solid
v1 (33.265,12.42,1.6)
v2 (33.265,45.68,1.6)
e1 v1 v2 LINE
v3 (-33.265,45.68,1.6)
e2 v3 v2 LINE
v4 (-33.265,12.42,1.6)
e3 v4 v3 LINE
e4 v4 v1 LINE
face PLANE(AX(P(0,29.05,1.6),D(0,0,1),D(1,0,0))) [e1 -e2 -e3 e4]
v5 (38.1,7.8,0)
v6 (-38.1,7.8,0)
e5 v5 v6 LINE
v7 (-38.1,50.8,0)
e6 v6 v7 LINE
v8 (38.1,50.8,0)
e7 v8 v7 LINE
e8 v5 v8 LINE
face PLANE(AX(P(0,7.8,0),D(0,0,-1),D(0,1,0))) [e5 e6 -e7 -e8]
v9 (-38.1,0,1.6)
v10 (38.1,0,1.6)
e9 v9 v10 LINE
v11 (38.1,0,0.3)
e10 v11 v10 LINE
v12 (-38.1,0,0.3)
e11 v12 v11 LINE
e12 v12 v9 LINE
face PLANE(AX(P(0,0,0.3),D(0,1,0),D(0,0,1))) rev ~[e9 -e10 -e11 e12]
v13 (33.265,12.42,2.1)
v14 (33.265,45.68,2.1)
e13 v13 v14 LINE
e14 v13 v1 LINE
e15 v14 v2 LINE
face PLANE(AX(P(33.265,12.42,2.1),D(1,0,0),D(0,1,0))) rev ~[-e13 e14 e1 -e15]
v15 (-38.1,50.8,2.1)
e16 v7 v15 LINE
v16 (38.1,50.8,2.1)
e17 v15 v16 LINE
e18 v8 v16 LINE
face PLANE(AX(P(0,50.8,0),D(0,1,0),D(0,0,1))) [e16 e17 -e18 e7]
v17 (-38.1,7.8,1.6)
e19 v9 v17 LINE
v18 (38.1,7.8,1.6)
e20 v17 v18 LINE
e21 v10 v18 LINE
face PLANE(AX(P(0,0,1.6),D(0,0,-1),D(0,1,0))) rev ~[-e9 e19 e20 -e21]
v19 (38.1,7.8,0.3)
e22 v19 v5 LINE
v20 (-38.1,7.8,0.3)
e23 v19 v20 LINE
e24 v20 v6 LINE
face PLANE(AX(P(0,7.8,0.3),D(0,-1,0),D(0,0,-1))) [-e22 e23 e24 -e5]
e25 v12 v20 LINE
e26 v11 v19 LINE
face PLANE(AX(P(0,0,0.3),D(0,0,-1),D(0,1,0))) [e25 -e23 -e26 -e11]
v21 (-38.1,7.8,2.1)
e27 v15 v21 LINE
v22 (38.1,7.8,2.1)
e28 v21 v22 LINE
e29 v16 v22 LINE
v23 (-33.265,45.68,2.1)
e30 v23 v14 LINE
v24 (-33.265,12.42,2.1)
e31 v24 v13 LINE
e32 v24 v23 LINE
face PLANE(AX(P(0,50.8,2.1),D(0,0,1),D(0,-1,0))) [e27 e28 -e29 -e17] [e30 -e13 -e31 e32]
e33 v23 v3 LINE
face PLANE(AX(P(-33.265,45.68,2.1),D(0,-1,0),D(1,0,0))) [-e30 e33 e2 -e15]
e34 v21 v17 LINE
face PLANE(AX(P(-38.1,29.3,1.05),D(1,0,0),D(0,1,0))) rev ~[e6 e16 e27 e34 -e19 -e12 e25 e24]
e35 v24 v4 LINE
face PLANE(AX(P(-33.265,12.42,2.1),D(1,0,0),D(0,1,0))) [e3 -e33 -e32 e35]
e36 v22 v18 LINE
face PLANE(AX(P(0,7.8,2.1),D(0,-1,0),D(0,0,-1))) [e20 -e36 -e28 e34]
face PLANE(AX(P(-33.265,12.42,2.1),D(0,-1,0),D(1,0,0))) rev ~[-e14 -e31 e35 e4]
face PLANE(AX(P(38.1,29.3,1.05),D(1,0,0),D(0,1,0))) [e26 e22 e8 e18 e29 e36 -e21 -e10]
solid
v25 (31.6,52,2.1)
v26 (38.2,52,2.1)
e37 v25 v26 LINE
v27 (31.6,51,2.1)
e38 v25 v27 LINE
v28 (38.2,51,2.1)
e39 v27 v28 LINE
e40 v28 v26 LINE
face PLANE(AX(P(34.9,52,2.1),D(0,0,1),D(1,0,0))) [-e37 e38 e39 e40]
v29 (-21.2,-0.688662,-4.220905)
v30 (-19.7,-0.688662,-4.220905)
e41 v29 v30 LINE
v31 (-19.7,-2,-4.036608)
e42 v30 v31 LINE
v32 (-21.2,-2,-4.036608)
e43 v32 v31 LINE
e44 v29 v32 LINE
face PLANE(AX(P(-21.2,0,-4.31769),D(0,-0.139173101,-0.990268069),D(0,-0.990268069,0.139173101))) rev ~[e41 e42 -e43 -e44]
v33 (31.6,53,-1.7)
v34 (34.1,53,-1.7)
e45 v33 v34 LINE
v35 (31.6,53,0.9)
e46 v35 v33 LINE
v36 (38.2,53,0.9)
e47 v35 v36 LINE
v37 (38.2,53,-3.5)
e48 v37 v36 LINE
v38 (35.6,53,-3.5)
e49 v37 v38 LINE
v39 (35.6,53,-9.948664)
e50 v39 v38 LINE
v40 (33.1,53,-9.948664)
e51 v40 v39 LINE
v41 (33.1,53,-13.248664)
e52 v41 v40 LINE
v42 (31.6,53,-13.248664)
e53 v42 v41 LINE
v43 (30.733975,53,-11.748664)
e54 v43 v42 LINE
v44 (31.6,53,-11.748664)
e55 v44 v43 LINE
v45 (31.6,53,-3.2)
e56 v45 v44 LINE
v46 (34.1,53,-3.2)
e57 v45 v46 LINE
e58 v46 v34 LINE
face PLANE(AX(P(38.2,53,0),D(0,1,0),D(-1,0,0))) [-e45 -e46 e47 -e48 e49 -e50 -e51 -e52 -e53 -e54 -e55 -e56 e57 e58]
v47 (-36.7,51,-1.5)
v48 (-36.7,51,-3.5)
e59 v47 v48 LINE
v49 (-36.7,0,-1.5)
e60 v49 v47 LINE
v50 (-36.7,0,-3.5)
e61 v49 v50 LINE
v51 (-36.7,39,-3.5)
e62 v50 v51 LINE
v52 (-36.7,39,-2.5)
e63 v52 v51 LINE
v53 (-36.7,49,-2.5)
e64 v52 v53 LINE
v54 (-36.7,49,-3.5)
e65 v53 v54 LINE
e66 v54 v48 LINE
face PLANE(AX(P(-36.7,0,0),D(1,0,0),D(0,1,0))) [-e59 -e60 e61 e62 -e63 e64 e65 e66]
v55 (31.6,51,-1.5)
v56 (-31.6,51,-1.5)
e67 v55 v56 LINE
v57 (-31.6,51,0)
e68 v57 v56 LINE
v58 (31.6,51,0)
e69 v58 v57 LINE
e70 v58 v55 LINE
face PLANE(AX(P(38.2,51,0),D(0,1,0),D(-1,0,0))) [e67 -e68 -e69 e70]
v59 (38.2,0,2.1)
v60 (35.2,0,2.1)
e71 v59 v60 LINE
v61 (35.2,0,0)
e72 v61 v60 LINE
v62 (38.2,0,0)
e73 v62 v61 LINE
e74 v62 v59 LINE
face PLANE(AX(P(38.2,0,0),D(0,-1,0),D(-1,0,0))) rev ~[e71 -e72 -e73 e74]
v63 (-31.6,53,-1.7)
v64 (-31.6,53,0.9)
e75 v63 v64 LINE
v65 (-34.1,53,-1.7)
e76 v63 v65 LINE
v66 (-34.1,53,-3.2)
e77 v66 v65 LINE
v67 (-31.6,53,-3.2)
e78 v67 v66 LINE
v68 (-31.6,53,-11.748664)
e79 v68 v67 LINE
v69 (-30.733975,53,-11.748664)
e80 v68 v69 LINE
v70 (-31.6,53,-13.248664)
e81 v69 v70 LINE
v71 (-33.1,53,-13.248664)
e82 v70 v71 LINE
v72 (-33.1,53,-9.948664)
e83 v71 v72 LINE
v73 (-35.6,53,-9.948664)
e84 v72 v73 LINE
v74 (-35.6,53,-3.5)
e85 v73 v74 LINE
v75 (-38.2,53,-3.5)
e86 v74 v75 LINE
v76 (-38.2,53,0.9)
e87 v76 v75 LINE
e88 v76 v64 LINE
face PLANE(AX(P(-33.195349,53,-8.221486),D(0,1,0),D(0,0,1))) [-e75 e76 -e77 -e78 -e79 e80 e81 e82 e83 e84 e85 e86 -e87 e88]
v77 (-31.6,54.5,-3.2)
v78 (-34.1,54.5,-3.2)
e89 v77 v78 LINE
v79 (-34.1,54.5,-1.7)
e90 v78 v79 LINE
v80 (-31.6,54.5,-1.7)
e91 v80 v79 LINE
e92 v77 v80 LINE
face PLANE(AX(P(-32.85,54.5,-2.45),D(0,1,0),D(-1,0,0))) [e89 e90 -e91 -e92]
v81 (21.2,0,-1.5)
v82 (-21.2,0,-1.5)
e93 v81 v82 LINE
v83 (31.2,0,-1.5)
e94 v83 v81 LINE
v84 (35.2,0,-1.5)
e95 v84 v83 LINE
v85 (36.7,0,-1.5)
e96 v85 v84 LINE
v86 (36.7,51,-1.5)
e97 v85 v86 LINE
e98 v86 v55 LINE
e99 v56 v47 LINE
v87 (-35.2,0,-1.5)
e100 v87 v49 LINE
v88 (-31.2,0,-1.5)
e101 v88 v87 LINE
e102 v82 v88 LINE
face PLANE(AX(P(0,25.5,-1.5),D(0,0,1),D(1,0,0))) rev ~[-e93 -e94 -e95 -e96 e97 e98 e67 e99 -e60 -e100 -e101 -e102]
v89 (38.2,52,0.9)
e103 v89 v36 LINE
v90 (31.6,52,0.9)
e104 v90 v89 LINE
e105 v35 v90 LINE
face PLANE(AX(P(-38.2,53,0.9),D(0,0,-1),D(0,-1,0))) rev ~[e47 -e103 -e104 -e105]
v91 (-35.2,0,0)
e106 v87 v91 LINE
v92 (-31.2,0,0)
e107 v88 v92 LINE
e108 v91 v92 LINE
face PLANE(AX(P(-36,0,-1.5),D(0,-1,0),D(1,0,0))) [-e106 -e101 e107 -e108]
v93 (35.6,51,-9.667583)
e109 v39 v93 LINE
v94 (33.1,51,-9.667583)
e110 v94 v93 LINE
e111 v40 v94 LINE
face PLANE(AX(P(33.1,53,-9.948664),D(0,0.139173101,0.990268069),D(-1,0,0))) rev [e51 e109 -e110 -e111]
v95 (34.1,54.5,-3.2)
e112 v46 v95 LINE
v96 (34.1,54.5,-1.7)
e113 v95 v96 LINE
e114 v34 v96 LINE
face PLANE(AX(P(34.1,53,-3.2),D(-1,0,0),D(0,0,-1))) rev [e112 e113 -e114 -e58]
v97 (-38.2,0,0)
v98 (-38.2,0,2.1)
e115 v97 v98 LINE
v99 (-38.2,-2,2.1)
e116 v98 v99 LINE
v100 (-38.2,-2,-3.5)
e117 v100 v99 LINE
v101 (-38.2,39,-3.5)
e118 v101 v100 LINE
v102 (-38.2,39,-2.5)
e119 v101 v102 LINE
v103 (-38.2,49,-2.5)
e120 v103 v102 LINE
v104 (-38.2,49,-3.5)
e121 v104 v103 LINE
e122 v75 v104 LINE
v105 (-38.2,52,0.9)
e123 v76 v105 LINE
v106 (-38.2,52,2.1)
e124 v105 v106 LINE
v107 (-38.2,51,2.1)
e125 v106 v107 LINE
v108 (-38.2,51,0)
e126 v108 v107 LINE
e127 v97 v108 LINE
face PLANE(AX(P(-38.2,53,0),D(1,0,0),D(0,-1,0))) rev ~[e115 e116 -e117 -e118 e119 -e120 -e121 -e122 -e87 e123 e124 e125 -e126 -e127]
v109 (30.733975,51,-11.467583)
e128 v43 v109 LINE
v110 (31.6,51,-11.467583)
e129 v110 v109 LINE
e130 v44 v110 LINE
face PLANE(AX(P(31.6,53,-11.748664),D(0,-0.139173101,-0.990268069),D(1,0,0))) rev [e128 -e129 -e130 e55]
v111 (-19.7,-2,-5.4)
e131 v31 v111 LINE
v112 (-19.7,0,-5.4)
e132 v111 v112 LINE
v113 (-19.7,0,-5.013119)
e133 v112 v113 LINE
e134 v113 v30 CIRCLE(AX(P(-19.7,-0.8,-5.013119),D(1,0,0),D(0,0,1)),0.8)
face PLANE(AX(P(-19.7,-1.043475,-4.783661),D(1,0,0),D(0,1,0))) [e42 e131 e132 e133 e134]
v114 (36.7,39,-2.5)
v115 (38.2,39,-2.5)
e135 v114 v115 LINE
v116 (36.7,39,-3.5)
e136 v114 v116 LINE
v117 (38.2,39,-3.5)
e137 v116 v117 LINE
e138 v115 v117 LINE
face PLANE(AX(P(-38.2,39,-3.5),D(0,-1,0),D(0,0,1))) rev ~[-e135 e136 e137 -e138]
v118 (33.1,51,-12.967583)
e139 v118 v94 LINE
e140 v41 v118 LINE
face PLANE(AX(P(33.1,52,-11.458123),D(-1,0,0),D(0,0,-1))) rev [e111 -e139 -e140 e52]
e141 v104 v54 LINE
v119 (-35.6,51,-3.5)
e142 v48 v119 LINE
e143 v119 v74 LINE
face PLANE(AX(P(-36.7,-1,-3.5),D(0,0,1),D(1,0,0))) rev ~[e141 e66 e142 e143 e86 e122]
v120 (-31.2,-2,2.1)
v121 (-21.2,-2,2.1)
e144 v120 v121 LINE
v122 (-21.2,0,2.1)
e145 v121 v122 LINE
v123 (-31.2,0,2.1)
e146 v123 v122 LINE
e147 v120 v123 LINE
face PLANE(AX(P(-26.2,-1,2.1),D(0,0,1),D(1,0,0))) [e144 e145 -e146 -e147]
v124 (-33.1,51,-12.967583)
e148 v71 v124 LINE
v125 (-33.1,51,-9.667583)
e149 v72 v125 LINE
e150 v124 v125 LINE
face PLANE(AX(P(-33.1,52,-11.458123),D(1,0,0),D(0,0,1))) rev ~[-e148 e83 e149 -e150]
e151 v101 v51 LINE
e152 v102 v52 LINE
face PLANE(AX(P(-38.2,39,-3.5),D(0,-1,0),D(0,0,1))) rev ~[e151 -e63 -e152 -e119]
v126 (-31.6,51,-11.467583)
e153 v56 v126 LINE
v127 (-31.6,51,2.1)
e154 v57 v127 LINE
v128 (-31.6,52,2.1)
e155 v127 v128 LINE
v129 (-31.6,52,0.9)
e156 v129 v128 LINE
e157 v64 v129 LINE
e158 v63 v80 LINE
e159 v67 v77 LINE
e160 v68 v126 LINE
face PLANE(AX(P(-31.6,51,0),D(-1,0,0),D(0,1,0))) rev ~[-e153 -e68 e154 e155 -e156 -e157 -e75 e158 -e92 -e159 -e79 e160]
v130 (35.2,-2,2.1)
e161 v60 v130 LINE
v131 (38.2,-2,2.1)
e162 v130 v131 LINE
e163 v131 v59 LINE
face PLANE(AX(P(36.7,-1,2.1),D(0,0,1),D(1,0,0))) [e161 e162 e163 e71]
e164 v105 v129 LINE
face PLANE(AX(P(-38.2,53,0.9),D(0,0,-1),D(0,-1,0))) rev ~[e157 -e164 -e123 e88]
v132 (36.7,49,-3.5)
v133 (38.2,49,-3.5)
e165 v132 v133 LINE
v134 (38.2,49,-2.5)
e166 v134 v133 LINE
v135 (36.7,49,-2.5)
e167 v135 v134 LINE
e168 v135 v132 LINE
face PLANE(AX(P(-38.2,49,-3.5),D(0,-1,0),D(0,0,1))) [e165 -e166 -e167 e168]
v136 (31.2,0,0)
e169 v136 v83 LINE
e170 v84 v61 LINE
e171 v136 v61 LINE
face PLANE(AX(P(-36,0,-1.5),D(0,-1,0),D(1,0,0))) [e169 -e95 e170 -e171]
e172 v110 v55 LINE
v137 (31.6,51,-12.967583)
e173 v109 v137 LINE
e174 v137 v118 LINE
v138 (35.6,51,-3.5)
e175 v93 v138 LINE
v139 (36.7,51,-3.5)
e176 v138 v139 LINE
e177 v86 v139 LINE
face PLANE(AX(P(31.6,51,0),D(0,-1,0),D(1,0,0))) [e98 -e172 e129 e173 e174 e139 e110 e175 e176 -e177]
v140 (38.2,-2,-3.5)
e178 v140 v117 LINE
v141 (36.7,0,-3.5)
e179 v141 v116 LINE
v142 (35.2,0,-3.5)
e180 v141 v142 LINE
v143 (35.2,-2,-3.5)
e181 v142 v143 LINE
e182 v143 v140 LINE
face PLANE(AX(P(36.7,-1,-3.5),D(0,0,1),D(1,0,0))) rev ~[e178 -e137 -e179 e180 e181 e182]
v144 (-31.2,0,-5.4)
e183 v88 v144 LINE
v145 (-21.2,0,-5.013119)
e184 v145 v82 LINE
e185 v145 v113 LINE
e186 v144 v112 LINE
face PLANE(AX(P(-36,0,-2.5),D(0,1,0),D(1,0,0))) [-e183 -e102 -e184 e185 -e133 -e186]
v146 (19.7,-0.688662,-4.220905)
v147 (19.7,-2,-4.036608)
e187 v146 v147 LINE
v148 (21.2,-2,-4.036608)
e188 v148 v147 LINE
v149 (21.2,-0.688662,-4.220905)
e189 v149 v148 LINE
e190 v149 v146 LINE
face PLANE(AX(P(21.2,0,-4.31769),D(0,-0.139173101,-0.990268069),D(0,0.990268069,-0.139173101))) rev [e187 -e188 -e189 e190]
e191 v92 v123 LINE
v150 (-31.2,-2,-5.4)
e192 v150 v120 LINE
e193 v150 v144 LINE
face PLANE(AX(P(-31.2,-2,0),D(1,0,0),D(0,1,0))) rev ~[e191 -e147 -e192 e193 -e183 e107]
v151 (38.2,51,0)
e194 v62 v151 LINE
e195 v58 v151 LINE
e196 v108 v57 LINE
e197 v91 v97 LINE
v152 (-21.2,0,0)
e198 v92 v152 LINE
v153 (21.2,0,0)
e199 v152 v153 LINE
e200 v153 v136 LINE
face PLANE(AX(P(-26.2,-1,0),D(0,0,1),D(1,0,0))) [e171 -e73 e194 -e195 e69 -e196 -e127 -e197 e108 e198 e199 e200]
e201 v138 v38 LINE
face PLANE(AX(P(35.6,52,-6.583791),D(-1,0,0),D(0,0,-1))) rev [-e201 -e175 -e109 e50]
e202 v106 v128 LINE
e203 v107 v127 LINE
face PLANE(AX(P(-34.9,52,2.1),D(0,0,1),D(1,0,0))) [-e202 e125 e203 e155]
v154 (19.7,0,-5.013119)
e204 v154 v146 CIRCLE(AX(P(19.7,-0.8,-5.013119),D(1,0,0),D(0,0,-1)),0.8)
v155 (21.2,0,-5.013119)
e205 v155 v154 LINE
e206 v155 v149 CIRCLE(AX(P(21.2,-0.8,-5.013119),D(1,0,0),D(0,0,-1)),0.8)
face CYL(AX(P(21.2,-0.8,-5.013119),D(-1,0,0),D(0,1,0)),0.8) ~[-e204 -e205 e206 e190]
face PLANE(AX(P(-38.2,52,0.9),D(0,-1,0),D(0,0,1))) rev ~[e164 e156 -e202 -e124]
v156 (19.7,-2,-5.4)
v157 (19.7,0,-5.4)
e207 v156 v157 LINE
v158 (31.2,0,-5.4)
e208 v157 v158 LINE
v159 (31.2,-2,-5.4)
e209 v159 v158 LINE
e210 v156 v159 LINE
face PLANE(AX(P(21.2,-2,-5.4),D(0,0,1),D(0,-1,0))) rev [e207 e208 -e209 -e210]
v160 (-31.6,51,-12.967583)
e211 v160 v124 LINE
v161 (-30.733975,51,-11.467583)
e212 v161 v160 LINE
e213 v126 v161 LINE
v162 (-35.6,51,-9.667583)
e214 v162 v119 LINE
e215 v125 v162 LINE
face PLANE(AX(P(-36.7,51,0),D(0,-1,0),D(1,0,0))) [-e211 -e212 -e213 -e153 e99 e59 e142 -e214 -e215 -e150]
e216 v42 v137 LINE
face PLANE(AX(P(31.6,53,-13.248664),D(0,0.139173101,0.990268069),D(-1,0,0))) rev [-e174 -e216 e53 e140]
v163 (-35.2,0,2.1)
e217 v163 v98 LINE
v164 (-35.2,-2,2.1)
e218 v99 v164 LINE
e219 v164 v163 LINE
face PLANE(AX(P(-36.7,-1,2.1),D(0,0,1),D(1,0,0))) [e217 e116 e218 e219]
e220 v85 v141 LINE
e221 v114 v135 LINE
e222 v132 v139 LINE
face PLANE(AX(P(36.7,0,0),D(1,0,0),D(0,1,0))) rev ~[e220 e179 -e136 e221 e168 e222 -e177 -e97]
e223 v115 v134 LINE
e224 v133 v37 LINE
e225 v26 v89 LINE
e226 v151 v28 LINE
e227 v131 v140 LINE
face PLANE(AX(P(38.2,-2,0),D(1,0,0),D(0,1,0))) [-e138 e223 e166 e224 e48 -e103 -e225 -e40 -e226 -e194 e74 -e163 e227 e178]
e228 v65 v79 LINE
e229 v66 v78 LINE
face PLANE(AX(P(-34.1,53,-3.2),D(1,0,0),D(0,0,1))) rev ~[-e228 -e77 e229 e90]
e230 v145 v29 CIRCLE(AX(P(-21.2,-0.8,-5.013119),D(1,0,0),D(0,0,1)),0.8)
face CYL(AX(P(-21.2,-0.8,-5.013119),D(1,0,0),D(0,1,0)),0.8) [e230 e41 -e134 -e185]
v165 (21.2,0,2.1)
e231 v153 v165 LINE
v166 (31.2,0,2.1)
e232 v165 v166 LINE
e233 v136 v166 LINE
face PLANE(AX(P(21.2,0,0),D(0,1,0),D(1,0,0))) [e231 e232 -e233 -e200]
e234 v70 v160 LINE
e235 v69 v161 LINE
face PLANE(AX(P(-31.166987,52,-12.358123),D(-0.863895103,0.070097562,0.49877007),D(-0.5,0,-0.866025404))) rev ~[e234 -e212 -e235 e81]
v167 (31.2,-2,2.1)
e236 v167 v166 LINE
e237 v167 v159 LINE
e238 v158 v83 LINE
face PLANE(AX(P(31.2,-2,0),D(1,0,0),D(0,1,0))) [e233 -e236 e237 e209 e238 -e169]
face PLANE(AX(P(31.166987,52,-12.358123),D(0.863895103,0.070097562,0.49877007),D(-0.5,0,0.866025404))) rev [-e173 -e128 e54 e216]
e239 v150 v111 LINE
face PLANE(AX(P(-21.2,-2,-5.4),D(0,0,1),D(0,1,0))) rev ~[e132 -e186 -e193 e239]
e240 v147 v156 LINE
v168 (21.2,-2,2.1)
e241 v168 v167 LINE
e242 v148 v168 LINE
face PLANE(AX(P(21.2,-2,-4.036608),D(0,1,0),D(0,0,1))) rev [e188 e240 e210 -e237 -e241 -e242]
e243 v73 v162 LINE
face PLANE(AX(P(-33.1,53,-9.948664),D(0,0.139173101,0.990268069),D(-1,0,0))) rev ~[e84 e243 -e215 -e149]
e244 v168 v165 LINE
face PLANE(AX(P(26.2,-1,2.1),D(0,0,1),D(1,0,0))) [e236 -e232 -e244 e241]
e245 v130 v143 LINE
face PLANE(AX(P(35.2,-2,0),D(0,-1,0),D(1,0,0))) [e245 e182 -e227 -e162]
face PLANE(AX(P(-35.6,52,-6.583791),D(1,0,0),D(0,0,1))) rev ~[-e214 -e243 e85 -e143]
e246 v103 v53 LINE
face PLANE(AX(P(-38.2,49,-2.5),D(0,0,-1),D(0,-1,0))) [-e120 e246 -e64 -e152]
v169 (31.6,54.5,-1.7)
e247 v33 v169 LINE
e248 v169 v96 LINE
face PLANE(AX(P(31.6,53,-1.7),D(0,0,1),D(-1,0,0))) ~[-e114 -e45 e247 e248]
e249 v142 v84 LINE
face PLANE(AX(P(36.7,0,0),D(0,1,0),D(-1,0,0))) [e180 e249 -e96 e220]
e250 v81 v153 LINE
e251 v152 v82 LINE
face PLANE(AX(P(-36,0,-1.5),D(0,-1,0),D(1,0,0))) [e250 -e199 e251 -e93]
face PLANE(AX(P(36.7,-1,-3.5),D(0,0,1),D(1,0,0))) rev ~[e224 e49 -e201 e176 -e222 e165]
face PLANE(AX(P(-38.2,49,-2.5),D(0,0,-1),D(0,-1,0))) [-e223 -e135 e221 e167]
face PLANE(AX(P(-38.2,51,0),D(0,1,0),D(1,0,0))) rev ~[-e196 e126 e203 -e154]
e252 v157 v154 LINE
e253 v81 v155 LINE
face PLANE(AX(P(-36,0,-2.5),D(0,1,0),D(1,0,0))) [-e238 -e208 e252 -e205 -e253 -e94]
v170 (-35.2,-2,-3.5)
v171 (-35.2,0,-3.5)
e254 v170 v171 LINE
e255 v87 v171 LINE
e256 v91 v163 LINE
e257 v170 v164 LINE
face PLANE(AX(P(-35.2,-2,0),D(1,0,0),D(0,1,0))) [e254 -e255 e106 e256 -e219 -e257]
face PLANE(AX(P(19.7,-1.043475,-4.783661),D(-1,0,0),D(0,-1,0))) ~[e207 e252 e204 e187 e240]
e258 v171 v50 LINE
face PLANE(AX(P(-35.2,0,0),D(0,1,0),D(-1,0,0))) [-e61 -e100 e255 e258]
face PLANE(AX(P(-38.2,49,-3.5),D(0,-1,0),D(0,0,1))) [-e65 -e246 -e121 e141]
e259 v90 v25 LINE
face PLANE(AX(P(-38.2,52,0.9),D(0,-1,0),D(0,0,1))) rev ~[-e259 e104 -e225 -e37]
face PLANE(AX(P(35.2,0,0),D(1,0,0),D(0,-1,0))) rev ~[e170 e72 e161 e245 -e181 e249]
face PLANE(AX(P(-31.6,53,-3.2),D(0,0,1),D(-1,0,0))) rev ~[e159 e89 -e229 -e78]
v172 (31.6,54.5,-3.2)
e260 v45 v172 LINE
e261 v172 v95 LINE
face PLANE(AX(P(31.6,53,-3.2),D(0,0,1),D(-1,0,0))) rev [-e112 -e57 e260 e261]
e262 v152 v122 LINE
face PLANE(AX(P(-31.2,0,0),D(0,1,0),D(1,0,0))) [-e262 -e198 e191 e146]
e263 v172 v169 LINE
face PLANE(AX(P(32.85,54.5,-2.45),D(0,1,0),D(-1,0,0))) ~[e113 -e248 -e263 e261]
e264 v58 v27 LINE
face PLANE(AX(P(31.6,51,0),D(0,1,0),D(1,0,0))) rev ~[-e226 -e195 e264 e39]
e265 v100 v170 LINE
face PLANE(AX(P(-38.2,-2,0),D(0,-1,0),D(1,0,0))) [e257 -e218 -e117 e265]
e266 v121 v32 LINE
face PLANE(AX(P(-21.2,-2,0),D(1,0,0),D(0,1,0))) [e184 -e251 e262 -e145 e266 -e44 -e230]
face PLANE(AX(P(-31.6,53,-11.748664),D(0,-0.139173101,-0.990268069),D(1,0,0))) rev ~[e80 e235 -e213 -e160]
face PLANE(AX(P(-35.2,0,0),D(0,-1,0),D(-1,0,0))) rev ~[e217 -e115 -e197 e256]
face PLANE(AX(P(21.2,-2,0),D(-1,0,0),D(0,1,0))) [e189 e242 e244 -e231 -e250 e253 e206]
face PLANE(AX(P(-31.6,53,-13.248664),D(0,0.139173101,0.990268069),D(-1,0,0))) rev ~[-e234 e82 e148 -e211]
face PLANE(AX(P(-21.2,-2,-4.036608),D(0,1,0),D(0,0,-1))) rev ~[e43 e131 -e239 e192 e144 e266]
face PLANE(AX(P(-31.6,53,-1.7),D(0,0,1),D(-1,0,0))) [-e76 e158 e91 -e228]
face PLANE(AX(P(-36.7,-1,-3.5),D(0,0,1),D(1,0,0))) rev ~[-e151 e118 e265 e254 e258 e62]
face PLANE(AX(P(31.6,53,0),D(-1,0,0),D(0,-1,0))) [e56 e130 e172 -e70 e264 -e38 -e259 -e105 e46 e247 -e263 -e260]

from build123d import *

# Parameters (mm, degrees)
F0_W      = 1.5
F0_H      = 51
F1_DEPTH  = 1.5
F2_DEPTH  = 3.5
F0_W_2    = 10
F0_H_2    = 2
F0_W_3    = 20
F3_DEPTH  = 5.4
F4_DEPTH  = 2.1
F5_W      = 72
F5_H      = 30
F6_DEPTH  = 1
F7_W      = 7.8
F7_H      = 1.3
F8_DEPTH  = 38.1
F9_W      = 66.53
F9_H      = 33.26
F10_DEPTH = 0.5
F12_DEPTH = 1.5
F13_R     = 0.8
F16_W     = 2.5
F16_H     = 1.5
F17_DEPTH = 1.5
F18_W     = 10
F18_H     = 1
F18_W_2   = 1
F18_H_2   = 1.2
F19_DEPTH = 76.401
F20_DEPTH = 1
F21_DEPTH = 7.501


# Not quite as in the source:
# - a pattern or mirror of a feature is missing from the dataset's text; its kind, count and spacing are read off the source's solid


with BuildPart() as f1:
    # F0 (on Top) → F1 (new body)
    with BuildSketch(Plane.XY):
        Polygon((-31.6, 51), (-36.7, 51), (-36.7, 0), (-35.2, 0), (-31.2, 0), (-21.2, 0), (-10, 0), (10, 0), (21.2, 0), (31.2, 0), (35.2, 0), (36.7, 0), (36.7, 51), (31.6, 51), align=None)
        with Locations((-37.45, 25.5)):
            Rectangle(F0_W, F0_H)
        with Locations((37.45, 25.5)):
            Rectangle(F0_W, F0_H)
    extrude(amount=-F1_DEPTH)

    # F0 (on Top) → F2 (join)
    with BuildSketch(Plane.XY):
        Polygon((-36.7, 0), (-38.2, 0), (-38.2, -2), (-35.2, -2), (-35.2, 0), align=None)
        Polygon((38.2, 0), (36.7, 0), (35.2, 0), (35.2, -2), (38.2, -2), align=None)
        with Locations((37.45, 25.5)):
            Rectangle(F0_W, F0_H)
        Polygon((31.6, 53), (31.6, 51), (36.7, 51), (38.2, 51), (38.2, 53), align=None)
        Polygon((-38.2, 53), (-38.2, 51), (-36.7, 51), (-31.6, 51), (-31.6, 53), align=None)
        with Locations((-37.45, 25.5)):
            Rectangle(F0_W, F0_H)
    extrude(amount=-F2_DEPTH)

    # F0 (on Top) → F3 (join)
    with BuildSketch(Plane.XY):
        with Locations((-26.2, -1)):
            Rectangle(F0_W_2, F0_H_2)
        with Locations((0, -1)):
            Rectangle(F0_W_3, F0_H_2)
        with Locations((26.2, -1)):
            Rectangle(F0_W_2, F0_H_2)
    extrude(amount=-F3_DEPTH)

    # F0 (on Top) → F4 (join)
    with BuildSketch(Plane.XY):
        Polygon((-38.2, 53), (-38.2, 51), (-36.7, 51), (-31.6, 51), (-31.6, 53), align=None)
        Polygon((31.6, 53), (31.6, 51), (36.7, 51), (38.2, 51), (38.2, 53), align=None)
        Polygon((-36.7, 0), (-38.2, 0), (-38.2, -2), (-35.2, -2), (-35.2, 0), align=None)
        with Locations((-26.2, -1)):
            Rectangle(F0_W_2, F0_H_2)
        with Locations((26.2, -1)):
            Rectangle(F0_W_2, F0_H_2)
        Polygon((38.2, 0), (36.7, 0), (35.2, 0), (35.2, -2), (38.2, -2), align=None)
        with Locations((0, -1)):
            Rectangle(F0_W_3, F0_H_2)
    extrude(amount=F4_DEPTH)

    # F5 (on face) → F6 (join)
    with BuildSketch(Plane(origin=(0, 0, -1.5), x_dir=(1, 0, 0), z_dir=(0, 0, -1))):
        with Locations((0, -15)):
            Rectangle(F5_W, F5_H)
    extrude(amount=F6_DEPTH)

    # F11 (on face) → F12 (join)
    with BuildSketch(Plane.YZ.offset(-21.2)):
        Polygon((-2, -4.0366079611), (-2, -5.4), (0, -5.4), (0, -4.3176896305), align=None)
    f12 = extrude(amount=F12_DEPTH)

    # F12_copies: F12 across plane
    add(f12.mirror(Plane(origin=(0, 0, 0), x_dir=(0, 0, 1), z_dir=(1, 0, 0))))

    # F13
    f13_edges = [f1.edges().sort_by_distance(p)[0] for p in [
        (20.45, 0, -4.31769),
        (-20.45, 0, -4.31769),
    ]]
    fillet(f13_edges, radius=F13_R)

    # F15: sweep along a path in F11
    with BuildLine(Plane.YZ.offset(-21.2)) as f15_path:
        Line((53, -9.9486642392), (51, -9.6675825698))
    # F14 (on face) → F15 (sweep)
    with BuildSketch(Plane(origin=(0, 53, 0), x_dir=(-1, 0, 0), z_dir=(0, 1, 0))):
        Polygon((35.6, -3.5), (31.6, -3.5), (31.6, -11.7486642392), (30.7339745962, -11.7486642392), (31.6, -13.2486642392), (33.1, -13.2486642392), (33.1, -9.9486642392), (35.6, -9.9486642392), align=None)
    f15 = sweep(path=f15_path.line)

    # F15_copies: F15 across plane
    add(f15.mirror(Plane(origin=(0, 0, 0), x_dir=(0, 0, 1), z_dir=(1, 0, 0))))

    # F16 (on face) → F17 (join)
    with BuildSketch(Plane(origin=(0, 53, 0), x_dir=(-1, 0, 0), z_dir=(0, 1, 0))):
        with Locations((32.85, -2.45)):
            Rectangle(F16_W, F16_H)
    f17 = extrude(amount=F17_DEPTH)

    # F17_copies: F17 across plane
    add(f17.mirror(Plane(origin=(0, 0, 0), x_dir=(0, 0, 1), z_dir=(1, 0, 0))))

    # F18 (on face) → F19 (cut, through all)
    with BuildSketch(Plane(origin=(-38.2, 0, 0), x_dir=(0, -1, 0), z_dir=(-1, 0, 0))):
        with Locations((-44, -3)):
            Rectangle(F18_W, F18_H)
        with Locations((-52.5, 1.5)):
            Rectangle(F18_W_2, F18_H_2)
    extrude(amount=-F19_DEPTH, mode=Mode.SUBTRACT)

    # F20 (cut, through all): a face of the model
    f20_faces = [f1.faces().sort_by_distance(p)[0] for p in [
        (0, 15, -2.5),
    ]]
    extrude(f20_faces, amount=-F20_DEPTH, mode=Mode.SUBTRACT)

    # F21 (cut, through all): a face of the model
    f21_faces = [f1.faces().sort_by_distance(p)[0] for p in [
        (0, -1, -5.4),
    ]]
    extrude(f21_faces, amount=-F21_DEPTH, mode=Mode.SUBTRACT)


with BuildPart() as f8:
    # F7 (on Right) → F8 (new body, symmetric)
    with BuildSketch(Plane.YZ):
        Polygon((50.8, 0), (50.8, 2.1), (7.8, 2.1), (7.8, 1.6), (7.8, 0.3), (7.8, 0), align=None)
        with Locations((3.9, 0.95)):
            Rectangle(F7_W, F7_H)
    extrude(amount=F8_DEPTH, both=True)

    # F9 (on face) → F10 (cut)
    with BuildSketch(Plane.XY.offset(2.1)):
        with Locations((0, 29.05)):
            Rectangle(F9_W, F9_H)
    extrude(amount=-F10_DEPTH, mode=Mode.SUBTRACT)


solid = Compound([f1.part, f8.part])
